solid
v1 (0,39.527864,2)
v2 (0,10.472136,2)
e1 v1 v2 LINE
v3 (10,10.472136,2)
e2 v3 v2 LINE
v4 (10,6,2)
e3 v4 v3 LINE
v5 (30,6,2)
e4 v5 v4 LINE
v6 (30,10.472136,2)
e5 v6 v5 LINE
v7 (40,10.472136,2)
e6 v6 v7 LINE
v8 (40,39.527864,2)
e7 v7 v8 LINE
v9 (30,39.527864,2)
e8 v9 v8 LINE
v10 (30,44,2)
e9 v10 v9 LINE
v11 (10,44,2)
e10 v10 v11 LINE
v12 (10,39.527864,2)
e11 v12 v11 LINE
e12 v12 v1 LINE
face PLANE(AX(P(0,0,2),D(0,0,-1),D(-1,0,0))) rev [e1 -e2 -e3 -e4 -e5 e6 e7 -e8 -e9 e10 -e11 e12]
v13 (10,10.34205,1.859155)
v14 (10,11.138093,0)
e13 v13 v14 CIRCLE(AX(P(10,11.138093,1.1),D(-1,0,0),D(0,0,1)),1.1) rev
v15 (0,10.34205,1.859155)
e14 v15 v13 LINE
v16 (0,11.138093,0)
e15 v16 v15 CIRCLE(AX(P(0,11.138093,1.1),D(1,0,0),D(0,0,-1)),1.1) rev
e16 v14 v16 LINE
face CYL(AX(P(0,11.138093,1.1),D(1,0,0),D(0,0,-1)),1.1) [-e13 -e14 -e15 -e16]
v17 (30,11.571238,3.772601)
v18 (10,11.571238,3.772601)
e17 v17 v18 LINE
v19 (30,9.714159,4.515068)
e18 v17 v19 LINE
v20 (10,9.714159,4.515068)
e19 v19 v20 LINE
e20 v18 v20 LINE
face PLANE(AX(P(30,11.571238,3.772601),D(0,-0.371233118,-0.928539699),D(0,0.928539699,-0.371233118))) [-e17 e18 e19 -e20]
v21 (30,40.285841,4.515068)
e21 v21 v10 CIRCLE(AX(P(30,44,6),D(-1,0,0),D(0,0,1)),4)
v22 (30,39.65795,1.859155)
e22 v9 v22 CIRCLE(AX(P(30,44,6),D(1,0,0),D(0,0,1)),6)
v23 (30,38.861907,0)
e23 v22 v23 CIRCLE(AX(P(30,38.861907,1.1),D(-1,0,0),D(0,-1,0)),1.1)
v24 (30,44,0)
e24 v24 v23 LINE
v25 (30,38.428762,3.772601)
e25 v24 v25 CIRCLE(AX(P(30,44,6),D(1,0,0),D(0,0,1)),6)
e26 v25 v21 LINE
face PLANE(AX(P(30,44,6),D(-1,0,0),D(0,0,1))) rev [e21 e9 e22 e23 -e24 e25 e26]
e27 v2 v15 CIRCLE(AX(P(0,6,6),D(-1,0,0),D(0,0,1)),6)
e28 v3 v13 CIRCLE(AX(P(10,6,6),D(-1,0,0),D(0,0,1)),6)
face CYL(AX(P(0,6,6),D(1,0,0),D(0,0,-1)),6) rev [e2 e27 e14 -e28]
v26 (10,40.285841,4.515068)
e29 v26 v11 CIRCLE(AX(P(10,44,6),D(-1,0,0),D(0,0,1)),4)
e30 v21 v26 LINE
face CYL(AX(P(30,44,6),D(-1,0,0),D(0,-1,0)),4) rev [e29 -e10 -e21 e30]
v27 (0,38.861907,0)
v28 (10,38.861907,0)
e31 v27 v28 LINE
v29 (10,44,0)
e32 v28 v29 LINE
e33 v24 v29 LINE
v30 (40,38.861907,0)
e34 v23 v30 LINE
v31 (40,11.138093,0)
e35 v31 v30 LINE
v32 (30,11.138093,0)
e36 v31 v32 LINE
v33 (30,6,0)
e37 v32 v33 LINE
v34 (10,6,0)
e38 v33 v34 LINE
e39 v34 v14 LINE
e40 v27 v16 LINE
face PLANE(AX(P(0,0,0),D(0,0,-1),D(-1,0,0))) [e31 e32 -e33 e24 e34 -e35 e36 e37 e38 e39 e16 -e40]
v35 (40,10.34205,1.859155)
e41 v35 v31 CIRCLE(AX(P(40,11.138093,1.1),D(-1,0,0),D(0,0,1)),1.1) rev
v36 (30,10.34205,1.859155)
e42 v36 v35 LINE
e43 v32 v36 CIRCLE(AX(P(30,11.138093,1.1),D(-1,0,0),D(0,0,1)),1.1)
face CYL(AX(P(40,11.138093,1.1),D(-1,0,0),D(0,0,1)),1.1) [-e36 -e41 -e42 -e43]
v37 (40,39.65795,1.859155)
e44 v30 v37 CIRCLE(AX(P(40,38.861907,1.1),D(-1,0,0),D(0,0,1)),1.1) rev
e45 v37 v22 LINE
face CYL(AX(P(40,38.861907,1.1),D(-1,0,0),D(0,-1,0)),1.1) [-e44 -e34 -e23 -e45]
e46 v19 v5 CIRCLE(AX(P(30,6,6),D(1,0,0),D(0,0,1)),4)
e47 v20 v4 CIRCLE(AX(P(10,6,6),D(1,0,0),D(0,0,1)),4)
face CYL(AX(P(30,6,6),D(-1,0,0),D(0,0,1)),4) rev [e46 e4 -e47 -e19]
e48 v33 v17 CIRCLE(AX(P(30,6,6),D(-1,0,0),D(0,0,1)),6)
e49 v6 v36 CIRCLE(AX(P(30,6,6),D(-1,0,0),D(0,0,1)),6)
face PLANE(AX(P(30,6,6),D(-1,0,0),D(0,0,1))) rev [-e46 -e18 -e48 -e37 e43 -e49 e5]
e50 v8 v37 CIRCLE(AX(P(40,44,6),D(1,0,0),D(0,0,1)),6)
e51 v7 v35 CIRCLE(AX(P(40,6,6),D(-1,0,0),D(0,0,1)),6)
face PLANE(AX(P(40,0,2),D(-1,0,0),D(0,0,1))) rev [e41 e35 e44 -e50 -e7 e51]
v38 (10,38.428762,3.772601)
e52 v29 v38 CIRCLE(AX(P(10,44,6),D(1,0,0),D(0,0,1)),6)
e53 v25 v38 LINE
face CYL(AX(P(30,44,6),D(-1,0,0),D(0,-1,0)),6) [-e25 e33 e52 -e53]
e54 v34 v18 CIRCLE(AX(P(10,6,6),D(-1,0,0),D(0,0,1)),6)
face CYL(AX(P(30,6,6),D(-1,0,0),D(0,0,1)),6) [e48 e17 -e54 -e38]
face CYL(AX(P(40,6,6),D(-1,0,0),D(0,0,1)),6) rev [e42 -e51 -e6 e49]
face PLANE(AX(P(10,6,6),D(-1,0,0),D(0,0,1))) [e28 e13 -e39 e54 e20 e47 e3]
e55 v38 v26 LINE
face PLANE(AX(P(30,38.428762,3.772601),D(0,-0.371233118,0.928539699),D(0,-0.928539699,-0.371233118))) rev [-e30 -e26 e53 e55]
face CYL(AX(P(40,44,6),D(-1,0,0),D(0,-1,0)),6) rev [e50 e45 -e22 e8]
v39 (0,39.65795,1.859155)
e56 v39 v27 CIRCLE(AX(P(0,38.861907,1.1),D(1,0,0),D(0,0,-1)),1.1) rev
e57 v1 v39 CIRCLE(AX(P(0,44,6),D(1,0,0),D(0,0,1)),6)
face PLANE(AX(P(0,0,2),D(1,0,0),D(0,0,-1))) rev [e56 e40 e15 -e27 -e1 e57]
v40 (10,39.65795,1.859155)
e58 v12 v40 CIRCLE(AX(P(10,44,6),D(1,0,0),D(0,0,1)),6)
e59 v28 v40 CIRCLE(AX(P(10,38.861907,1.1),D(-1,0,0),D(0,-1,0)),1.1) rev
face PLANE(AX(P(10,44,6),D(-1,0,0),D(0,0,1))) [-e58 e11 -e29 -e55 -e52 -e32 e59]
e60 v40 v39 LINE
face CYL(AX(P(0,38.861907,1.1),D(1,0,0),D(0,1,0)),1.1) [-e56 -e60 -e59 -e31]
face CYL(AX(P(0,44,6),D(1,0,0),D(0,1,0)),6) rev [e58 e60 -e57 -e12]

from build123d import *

# Parameters (mm, degrees)
SKETCH1_W               = 40
SKETCH1_H               = 50
BOSS_EXTRUDE1_DEPTH     = 2
SKETCH3_W               = 40
SKETCH3_H               = 6
CUT_EXTRUDE3_DEPTH      = 3
SKETCH8_W               = 40
SKETCH8_H               = 6
CUT_EXTRUDE4_DEPTH      = 10
BOSS_EXTRUDE2_DEPTH     = 10
CUT_EXTRUDE5_START      = 10
SKETCH9_R               = 6
CUT_EXTRUDE5_DEPTH      = 10
MIRROR4_START           = 10
MIRROR4_COPY_1_SKETCH_R = 6
MIRROR4_COPY_1_DEPTH    = 10
FILLET1_R               = 1.1


with BuildPart() as part:
    # Sketch1 → Boss-Extrude1 (new body)
    with BuildSketch(Plane.XY):
        with Locations((20, 25)):
            Rectangle(SKETCH1_W, SKETCH1_H)
    extrude(amount=BOSS_EXTRUDE1_DEPTH)

    # Sketch3 → Cut-Extrude3 (cut)
    with BuildSketch(Plane.XY.offset(2)):
        with Locations((20, 3)):
            Rectangle(SKETCH3_W, SKETCH3_H)
    extrude(amount=-CUT_EXTRUDE3_DEPTH, mode=Mode.SUBTRACT)

    # Sketch8 → Cut-Extrude4 (cut)
    with BuildSketch(Plane.XY.offset(2)):
        with Locations((20, 47)):
            Rectangle(SKETCH8_W, SKETCH8_H)
    extrude(amount=-CUT_EXTRUDE4_DEPTH, mode=Mode.SUBTRACT)

    # Sketch6 → Boss-Extrude2 (add, symmetric)
    with BuildSketch(Plane(origin=(20, 0, -40), x_dir=(0, 0, 1), z_dir=(-1, 0, 0))):
        with BuildLine():
            Line((43.77260129, 11.571238192), (44.515067527, 9.714158794))
            ThreePointArc((44.515067527, 9.714158794), (48.242796258, 9.312078644), (50, 6))
            ThreePointArc((50, 6), (46, 2), (42, 6))
            Line((42, 6), (40, 6))
            ThreePointArc((40, 6), (46, 0), (52, 6))
            ThreePointArc((52, 6), (49.364194387, 10.968117966), (43.77260129, 11.571238192))
        make_face()
    boss_extrude2 = extrude(amount=BOSS_EXTRUDE2_DEPTH, both=True)

    # Mirror2: Boss-Extrude2 across plane
    add(boss_extrude2.mirror(Plane(origin=(0, 25, 0), x_dir=(0, 0, 1), z_dir=(0, -1, 0))))

    # Sketch9 → Cut-Extrude5 (cut)
    with BuildSketch(Plane.ZY.offset(-10).offset(CUT_EXTRUDE5_START)):
        with Locations((6, 6)):
            Circle(SKETCH9_R)
    cut_extrude5 = extrude(amount=-CUT_EXTRUDE5_DEPTH, mode=Mode.SUBTRACT)

    # Mirror3: Cut-Extrude5 across plane
    add(cut_extrude5.mirror(Plane(origin=(20, 0, 0), x_dir=(0, 0, 1), z_dir=(1, 0, 0))), mode=Mode.SUBTRACT)

    # Mirror4: Cut-Extrude5 across plane
    add(cut_extrude5.mirror(Plane(origin=(0, 25, 0), x_dir=(0, 0, 1), z_dir=(0, -1, 0))), mode=Mode.SUBTRACT)

    # Mirror4 copy 1 sketch → Mirror4 copy 1 (cut)
    with BuildSketch(Plane(origin=(30, 50, 0), x_dir=(0, 0, 1), z_dir=(1, 0, 0)).offset(MIRROR4_START)):
        with Locations((6, 6)):
            Circle(MIRROR4_COPY_1_SKETCH_R)
    extrude(amount=-MIRROR4_COPY_1_DEPTH, mode=Mode.SUBTRACT)

    # Fillet1
    # the kernel refuses this fillet: 1.1 mm, written as the material it takes off along each edge
    with BuildSketch(Plane(origin=(70.828558189, 6, 0), x_dir=(0, 0.9192771195538384, 0.393610946830494), z_dir=(-1, 0, 0)), Plane(origin=(10, 6, 0), x_dir=(0, 0.9192771195538384, 0.3936109468304938), z_dir=(-1, 0, 0))) as fillet1_piece_1:
        with BuildLine():
            CenterArc((5.156303403, 1.011204832), FILLET1_R, 113.179370495, 133.641259009)
            Line((4.723331362, 2.022409663), (4.714671921, 2.04263376))
            Line((4.714671921, 2.04263376), (-0.008659441, 0.020224097))
            Line((-0.008659441, 0.020224097), (0.008659441, -0.020224097))
            ThreePointArc((0.008659441, -0.020224097), (2.361665681, 0.462337283), (4.714671921, -0.020224097))
            Line((4.714671921, -0.020224097), (4.723331362, 0))
        make_face()
    extrude(amount=40.828558189, mode=Mode.SUBTRACT)
    with BuildSketch(Plane(origin=(70.828558189, 6, 0), x_dir=(0, 0.9192771195538384, 0.393610946830494), z_dir=(-1, 0, 0))) as fillet1_piece_2_section:
        with BuildLine():
            CenterArc((5.156303403, 1.011204832), FILLET1_R, 113.179370495, 133.641259009)
            Line((4.723331362, 2.022409663), (4.714671921, 2.04263376))
            Line((4.714671921, 2.04263376), (-0.008659441, 0.020224097))
            Line((-0.008659441, 0.020224097), (0.008659441, -0.020224097))
            ThreePointArc((0.008659441, -0.020224097), (2.361665681, 0.462337283), (4.714671921, -0.020224097))
            Line((4.714671921, -0.020224097), (4.723331362, 0))
        make_face()
    fillet1_piece_2 = extrude(amount=71.657116378, mode=Mode.PRIVATE)
    fillet1_piece_2 = split(fillet1_piece_2, bisect_by=Plane(origin=(10, 9.140941458, 0.431936904), z_dir=(-1, 0, 0)), keep=Keep.TOP, mode=Mode.PRIVATE)
    add(fillet1_piece_2, mode=Mode.SUBTRACT)
    with BuildSketch(Plane(origin=(70.828558189, 44, 0), x_dir=(0, -0.9192771195538351, 0.39361094683050163), z_dir=(-1, 0, 0)), Plane(origin=(10, 44, 0), x_dir=(0, -0.9192771195538407, 0.39361094683048864), z_dir=(-1, 0, 0))) as fillet1_piece_3:
        with BuildLine():
            CenterArc((5.156303403, -1.011204832), FILLET1_R, 113.179370495, 133.641259009)
            Line((4.723331362, -2.022409663), (4.714671921, -2.04263376))
            Line((4.714671921, -2.04263376), (-0.008659441, -0.020224097))
            Line((-0.008659441, -0.020224097), (0.008659441, 0.020224097))
            ThreePointArc((0.008659441, 0.020224097), (2.361665681, -0.462337283), (4.714671921, 0.020224097))
            Line((4.714671921, 0.020224097), (4.723331362, 0))
        make_face()
    extrude(amount=40.828558189, mode=Mode.SUBTRACT)
    with BuildSketch(Plane(origin=(70.828558189, 44, 0), x_dir=(0, -0.9192771195538351, 0.39361094683050163), z_dir=(-1, 0, 0))) as fillet1_piece_4_section:
        with BuildLine():
            CenterArc((5.156303403, -1.011204832), FILLET1_R, 113.179370495, 133.641259009)
            Line((4.723331362, -2.022409663), (4.714671921, -2.04263376))
            Line((4.714671921, -2.04263376), (-0.008659441, -0.020224097))
            Line((-0.008659441, -0.020224097), (0.008659441, 0.020224097))
            ThreePointArc((0.008659441, 0.020224097), (2.361665681, -0.462337283), (4.714671921, 0.020224097))
            Line((4.714671921, 0.020224097), (4.723331362, 0))
        make_face()
    fillet1_piece_4 = extrude(amount=71.657116378, mode=Mode.PRIVATE)
    fillet1_piece_4 = split(fillet1_piece_4, bisect_by=Plane(origin=(10, 40.859058542, 0.431936904), z_dir=(-1, 0, 0)), keep=Keep.TOP, mode=Mode.PRIVATE)
    add(fillet1_piece_4, mode=Mode.SUBTRACT)
    with BuildSketch(Plane(origin=(40.828558189, 6, 0), x_dir=(0, 0.9192771195538384, 0.393610946830494), z_dir=(-1, 0, 0))) as fillet1_piece_5_section:
        with BuildLine():
            CenterArc((5.156303403, 1.011204832), FILLET1_R, 113.179370495, 133.641259009)
            Line((4.723331362, 2.022409663), (4.714671921, 2.04263376))
            Line((4.714671921, 2.04263376), (-0.008659441, 0.020224097))
            Line((-0.008659441, 0.020224097), (0.008659441, -0.020224097))
            ThreePointArc((0.008659441, -0.020224097), (2.361665681, 0.462337283), (4.714671921, -0.020224097))
            Line((4.714671921, -0.020224097), (4.723331362, 0))
        make_face()
    fillet1_piece_5 = extrude(amount=71.657116378, mode=Mode.PRIVATE)
    fillet1_piece_5 = split(fillet1_piece_5, bisect_by=Plane(origin=(30, 9.140941458, 0.431936904), z_dir=(1, 0, 0)), keep=Keep.TOP, mode=Mode.PRIVATE)
    add(fillet1_piece_5, mode=Mode.SUBTRACT)
    with BuildSketch(Plane(origin=(40.828558189, 44, 0), x_dir=(0, -0.9192771195538353, 0.3936109468305011), z_dir=(-1, 0, 0))) as fillet1_piece_6_section:
        with BuildLine():
            CenterArc((5.156303403, -1.011204832), FILLET1_R, 113.179370495, 133.641259009)
            Line((4.723331362, -2.022409663), (4.714671921, -2.04263376))
            Line((4.714671921, -2.04263376), (-0.008659441, -0.020224097))
            Line((-0.008659441, -0.020224097), (0.008659441, 0.020224097))
            ThreePointArc((0.008659441, 0.020224097), (2.361665681, -0.462337283), (4.714671921, 0.020224097))
            Line((4.714671921, 0.020224097), (4.723331362, 0))
        make_face()
    fillet1_piece_6 = extrude(amount=71.657116378, mode=Mode.PRIVATE)
    fillet1_piece_6 = split(fillet1_piece_6, bisect_by=Plane(origin=(30, 40.859058542, 0.431936904), z_dir=(1, 0, 0)), keep=Keep.TOP, mode=Mode.PRIVATE)
    add(fillet1_piece_6, mode=Mode.SUBTRACT)


solid = part.part
